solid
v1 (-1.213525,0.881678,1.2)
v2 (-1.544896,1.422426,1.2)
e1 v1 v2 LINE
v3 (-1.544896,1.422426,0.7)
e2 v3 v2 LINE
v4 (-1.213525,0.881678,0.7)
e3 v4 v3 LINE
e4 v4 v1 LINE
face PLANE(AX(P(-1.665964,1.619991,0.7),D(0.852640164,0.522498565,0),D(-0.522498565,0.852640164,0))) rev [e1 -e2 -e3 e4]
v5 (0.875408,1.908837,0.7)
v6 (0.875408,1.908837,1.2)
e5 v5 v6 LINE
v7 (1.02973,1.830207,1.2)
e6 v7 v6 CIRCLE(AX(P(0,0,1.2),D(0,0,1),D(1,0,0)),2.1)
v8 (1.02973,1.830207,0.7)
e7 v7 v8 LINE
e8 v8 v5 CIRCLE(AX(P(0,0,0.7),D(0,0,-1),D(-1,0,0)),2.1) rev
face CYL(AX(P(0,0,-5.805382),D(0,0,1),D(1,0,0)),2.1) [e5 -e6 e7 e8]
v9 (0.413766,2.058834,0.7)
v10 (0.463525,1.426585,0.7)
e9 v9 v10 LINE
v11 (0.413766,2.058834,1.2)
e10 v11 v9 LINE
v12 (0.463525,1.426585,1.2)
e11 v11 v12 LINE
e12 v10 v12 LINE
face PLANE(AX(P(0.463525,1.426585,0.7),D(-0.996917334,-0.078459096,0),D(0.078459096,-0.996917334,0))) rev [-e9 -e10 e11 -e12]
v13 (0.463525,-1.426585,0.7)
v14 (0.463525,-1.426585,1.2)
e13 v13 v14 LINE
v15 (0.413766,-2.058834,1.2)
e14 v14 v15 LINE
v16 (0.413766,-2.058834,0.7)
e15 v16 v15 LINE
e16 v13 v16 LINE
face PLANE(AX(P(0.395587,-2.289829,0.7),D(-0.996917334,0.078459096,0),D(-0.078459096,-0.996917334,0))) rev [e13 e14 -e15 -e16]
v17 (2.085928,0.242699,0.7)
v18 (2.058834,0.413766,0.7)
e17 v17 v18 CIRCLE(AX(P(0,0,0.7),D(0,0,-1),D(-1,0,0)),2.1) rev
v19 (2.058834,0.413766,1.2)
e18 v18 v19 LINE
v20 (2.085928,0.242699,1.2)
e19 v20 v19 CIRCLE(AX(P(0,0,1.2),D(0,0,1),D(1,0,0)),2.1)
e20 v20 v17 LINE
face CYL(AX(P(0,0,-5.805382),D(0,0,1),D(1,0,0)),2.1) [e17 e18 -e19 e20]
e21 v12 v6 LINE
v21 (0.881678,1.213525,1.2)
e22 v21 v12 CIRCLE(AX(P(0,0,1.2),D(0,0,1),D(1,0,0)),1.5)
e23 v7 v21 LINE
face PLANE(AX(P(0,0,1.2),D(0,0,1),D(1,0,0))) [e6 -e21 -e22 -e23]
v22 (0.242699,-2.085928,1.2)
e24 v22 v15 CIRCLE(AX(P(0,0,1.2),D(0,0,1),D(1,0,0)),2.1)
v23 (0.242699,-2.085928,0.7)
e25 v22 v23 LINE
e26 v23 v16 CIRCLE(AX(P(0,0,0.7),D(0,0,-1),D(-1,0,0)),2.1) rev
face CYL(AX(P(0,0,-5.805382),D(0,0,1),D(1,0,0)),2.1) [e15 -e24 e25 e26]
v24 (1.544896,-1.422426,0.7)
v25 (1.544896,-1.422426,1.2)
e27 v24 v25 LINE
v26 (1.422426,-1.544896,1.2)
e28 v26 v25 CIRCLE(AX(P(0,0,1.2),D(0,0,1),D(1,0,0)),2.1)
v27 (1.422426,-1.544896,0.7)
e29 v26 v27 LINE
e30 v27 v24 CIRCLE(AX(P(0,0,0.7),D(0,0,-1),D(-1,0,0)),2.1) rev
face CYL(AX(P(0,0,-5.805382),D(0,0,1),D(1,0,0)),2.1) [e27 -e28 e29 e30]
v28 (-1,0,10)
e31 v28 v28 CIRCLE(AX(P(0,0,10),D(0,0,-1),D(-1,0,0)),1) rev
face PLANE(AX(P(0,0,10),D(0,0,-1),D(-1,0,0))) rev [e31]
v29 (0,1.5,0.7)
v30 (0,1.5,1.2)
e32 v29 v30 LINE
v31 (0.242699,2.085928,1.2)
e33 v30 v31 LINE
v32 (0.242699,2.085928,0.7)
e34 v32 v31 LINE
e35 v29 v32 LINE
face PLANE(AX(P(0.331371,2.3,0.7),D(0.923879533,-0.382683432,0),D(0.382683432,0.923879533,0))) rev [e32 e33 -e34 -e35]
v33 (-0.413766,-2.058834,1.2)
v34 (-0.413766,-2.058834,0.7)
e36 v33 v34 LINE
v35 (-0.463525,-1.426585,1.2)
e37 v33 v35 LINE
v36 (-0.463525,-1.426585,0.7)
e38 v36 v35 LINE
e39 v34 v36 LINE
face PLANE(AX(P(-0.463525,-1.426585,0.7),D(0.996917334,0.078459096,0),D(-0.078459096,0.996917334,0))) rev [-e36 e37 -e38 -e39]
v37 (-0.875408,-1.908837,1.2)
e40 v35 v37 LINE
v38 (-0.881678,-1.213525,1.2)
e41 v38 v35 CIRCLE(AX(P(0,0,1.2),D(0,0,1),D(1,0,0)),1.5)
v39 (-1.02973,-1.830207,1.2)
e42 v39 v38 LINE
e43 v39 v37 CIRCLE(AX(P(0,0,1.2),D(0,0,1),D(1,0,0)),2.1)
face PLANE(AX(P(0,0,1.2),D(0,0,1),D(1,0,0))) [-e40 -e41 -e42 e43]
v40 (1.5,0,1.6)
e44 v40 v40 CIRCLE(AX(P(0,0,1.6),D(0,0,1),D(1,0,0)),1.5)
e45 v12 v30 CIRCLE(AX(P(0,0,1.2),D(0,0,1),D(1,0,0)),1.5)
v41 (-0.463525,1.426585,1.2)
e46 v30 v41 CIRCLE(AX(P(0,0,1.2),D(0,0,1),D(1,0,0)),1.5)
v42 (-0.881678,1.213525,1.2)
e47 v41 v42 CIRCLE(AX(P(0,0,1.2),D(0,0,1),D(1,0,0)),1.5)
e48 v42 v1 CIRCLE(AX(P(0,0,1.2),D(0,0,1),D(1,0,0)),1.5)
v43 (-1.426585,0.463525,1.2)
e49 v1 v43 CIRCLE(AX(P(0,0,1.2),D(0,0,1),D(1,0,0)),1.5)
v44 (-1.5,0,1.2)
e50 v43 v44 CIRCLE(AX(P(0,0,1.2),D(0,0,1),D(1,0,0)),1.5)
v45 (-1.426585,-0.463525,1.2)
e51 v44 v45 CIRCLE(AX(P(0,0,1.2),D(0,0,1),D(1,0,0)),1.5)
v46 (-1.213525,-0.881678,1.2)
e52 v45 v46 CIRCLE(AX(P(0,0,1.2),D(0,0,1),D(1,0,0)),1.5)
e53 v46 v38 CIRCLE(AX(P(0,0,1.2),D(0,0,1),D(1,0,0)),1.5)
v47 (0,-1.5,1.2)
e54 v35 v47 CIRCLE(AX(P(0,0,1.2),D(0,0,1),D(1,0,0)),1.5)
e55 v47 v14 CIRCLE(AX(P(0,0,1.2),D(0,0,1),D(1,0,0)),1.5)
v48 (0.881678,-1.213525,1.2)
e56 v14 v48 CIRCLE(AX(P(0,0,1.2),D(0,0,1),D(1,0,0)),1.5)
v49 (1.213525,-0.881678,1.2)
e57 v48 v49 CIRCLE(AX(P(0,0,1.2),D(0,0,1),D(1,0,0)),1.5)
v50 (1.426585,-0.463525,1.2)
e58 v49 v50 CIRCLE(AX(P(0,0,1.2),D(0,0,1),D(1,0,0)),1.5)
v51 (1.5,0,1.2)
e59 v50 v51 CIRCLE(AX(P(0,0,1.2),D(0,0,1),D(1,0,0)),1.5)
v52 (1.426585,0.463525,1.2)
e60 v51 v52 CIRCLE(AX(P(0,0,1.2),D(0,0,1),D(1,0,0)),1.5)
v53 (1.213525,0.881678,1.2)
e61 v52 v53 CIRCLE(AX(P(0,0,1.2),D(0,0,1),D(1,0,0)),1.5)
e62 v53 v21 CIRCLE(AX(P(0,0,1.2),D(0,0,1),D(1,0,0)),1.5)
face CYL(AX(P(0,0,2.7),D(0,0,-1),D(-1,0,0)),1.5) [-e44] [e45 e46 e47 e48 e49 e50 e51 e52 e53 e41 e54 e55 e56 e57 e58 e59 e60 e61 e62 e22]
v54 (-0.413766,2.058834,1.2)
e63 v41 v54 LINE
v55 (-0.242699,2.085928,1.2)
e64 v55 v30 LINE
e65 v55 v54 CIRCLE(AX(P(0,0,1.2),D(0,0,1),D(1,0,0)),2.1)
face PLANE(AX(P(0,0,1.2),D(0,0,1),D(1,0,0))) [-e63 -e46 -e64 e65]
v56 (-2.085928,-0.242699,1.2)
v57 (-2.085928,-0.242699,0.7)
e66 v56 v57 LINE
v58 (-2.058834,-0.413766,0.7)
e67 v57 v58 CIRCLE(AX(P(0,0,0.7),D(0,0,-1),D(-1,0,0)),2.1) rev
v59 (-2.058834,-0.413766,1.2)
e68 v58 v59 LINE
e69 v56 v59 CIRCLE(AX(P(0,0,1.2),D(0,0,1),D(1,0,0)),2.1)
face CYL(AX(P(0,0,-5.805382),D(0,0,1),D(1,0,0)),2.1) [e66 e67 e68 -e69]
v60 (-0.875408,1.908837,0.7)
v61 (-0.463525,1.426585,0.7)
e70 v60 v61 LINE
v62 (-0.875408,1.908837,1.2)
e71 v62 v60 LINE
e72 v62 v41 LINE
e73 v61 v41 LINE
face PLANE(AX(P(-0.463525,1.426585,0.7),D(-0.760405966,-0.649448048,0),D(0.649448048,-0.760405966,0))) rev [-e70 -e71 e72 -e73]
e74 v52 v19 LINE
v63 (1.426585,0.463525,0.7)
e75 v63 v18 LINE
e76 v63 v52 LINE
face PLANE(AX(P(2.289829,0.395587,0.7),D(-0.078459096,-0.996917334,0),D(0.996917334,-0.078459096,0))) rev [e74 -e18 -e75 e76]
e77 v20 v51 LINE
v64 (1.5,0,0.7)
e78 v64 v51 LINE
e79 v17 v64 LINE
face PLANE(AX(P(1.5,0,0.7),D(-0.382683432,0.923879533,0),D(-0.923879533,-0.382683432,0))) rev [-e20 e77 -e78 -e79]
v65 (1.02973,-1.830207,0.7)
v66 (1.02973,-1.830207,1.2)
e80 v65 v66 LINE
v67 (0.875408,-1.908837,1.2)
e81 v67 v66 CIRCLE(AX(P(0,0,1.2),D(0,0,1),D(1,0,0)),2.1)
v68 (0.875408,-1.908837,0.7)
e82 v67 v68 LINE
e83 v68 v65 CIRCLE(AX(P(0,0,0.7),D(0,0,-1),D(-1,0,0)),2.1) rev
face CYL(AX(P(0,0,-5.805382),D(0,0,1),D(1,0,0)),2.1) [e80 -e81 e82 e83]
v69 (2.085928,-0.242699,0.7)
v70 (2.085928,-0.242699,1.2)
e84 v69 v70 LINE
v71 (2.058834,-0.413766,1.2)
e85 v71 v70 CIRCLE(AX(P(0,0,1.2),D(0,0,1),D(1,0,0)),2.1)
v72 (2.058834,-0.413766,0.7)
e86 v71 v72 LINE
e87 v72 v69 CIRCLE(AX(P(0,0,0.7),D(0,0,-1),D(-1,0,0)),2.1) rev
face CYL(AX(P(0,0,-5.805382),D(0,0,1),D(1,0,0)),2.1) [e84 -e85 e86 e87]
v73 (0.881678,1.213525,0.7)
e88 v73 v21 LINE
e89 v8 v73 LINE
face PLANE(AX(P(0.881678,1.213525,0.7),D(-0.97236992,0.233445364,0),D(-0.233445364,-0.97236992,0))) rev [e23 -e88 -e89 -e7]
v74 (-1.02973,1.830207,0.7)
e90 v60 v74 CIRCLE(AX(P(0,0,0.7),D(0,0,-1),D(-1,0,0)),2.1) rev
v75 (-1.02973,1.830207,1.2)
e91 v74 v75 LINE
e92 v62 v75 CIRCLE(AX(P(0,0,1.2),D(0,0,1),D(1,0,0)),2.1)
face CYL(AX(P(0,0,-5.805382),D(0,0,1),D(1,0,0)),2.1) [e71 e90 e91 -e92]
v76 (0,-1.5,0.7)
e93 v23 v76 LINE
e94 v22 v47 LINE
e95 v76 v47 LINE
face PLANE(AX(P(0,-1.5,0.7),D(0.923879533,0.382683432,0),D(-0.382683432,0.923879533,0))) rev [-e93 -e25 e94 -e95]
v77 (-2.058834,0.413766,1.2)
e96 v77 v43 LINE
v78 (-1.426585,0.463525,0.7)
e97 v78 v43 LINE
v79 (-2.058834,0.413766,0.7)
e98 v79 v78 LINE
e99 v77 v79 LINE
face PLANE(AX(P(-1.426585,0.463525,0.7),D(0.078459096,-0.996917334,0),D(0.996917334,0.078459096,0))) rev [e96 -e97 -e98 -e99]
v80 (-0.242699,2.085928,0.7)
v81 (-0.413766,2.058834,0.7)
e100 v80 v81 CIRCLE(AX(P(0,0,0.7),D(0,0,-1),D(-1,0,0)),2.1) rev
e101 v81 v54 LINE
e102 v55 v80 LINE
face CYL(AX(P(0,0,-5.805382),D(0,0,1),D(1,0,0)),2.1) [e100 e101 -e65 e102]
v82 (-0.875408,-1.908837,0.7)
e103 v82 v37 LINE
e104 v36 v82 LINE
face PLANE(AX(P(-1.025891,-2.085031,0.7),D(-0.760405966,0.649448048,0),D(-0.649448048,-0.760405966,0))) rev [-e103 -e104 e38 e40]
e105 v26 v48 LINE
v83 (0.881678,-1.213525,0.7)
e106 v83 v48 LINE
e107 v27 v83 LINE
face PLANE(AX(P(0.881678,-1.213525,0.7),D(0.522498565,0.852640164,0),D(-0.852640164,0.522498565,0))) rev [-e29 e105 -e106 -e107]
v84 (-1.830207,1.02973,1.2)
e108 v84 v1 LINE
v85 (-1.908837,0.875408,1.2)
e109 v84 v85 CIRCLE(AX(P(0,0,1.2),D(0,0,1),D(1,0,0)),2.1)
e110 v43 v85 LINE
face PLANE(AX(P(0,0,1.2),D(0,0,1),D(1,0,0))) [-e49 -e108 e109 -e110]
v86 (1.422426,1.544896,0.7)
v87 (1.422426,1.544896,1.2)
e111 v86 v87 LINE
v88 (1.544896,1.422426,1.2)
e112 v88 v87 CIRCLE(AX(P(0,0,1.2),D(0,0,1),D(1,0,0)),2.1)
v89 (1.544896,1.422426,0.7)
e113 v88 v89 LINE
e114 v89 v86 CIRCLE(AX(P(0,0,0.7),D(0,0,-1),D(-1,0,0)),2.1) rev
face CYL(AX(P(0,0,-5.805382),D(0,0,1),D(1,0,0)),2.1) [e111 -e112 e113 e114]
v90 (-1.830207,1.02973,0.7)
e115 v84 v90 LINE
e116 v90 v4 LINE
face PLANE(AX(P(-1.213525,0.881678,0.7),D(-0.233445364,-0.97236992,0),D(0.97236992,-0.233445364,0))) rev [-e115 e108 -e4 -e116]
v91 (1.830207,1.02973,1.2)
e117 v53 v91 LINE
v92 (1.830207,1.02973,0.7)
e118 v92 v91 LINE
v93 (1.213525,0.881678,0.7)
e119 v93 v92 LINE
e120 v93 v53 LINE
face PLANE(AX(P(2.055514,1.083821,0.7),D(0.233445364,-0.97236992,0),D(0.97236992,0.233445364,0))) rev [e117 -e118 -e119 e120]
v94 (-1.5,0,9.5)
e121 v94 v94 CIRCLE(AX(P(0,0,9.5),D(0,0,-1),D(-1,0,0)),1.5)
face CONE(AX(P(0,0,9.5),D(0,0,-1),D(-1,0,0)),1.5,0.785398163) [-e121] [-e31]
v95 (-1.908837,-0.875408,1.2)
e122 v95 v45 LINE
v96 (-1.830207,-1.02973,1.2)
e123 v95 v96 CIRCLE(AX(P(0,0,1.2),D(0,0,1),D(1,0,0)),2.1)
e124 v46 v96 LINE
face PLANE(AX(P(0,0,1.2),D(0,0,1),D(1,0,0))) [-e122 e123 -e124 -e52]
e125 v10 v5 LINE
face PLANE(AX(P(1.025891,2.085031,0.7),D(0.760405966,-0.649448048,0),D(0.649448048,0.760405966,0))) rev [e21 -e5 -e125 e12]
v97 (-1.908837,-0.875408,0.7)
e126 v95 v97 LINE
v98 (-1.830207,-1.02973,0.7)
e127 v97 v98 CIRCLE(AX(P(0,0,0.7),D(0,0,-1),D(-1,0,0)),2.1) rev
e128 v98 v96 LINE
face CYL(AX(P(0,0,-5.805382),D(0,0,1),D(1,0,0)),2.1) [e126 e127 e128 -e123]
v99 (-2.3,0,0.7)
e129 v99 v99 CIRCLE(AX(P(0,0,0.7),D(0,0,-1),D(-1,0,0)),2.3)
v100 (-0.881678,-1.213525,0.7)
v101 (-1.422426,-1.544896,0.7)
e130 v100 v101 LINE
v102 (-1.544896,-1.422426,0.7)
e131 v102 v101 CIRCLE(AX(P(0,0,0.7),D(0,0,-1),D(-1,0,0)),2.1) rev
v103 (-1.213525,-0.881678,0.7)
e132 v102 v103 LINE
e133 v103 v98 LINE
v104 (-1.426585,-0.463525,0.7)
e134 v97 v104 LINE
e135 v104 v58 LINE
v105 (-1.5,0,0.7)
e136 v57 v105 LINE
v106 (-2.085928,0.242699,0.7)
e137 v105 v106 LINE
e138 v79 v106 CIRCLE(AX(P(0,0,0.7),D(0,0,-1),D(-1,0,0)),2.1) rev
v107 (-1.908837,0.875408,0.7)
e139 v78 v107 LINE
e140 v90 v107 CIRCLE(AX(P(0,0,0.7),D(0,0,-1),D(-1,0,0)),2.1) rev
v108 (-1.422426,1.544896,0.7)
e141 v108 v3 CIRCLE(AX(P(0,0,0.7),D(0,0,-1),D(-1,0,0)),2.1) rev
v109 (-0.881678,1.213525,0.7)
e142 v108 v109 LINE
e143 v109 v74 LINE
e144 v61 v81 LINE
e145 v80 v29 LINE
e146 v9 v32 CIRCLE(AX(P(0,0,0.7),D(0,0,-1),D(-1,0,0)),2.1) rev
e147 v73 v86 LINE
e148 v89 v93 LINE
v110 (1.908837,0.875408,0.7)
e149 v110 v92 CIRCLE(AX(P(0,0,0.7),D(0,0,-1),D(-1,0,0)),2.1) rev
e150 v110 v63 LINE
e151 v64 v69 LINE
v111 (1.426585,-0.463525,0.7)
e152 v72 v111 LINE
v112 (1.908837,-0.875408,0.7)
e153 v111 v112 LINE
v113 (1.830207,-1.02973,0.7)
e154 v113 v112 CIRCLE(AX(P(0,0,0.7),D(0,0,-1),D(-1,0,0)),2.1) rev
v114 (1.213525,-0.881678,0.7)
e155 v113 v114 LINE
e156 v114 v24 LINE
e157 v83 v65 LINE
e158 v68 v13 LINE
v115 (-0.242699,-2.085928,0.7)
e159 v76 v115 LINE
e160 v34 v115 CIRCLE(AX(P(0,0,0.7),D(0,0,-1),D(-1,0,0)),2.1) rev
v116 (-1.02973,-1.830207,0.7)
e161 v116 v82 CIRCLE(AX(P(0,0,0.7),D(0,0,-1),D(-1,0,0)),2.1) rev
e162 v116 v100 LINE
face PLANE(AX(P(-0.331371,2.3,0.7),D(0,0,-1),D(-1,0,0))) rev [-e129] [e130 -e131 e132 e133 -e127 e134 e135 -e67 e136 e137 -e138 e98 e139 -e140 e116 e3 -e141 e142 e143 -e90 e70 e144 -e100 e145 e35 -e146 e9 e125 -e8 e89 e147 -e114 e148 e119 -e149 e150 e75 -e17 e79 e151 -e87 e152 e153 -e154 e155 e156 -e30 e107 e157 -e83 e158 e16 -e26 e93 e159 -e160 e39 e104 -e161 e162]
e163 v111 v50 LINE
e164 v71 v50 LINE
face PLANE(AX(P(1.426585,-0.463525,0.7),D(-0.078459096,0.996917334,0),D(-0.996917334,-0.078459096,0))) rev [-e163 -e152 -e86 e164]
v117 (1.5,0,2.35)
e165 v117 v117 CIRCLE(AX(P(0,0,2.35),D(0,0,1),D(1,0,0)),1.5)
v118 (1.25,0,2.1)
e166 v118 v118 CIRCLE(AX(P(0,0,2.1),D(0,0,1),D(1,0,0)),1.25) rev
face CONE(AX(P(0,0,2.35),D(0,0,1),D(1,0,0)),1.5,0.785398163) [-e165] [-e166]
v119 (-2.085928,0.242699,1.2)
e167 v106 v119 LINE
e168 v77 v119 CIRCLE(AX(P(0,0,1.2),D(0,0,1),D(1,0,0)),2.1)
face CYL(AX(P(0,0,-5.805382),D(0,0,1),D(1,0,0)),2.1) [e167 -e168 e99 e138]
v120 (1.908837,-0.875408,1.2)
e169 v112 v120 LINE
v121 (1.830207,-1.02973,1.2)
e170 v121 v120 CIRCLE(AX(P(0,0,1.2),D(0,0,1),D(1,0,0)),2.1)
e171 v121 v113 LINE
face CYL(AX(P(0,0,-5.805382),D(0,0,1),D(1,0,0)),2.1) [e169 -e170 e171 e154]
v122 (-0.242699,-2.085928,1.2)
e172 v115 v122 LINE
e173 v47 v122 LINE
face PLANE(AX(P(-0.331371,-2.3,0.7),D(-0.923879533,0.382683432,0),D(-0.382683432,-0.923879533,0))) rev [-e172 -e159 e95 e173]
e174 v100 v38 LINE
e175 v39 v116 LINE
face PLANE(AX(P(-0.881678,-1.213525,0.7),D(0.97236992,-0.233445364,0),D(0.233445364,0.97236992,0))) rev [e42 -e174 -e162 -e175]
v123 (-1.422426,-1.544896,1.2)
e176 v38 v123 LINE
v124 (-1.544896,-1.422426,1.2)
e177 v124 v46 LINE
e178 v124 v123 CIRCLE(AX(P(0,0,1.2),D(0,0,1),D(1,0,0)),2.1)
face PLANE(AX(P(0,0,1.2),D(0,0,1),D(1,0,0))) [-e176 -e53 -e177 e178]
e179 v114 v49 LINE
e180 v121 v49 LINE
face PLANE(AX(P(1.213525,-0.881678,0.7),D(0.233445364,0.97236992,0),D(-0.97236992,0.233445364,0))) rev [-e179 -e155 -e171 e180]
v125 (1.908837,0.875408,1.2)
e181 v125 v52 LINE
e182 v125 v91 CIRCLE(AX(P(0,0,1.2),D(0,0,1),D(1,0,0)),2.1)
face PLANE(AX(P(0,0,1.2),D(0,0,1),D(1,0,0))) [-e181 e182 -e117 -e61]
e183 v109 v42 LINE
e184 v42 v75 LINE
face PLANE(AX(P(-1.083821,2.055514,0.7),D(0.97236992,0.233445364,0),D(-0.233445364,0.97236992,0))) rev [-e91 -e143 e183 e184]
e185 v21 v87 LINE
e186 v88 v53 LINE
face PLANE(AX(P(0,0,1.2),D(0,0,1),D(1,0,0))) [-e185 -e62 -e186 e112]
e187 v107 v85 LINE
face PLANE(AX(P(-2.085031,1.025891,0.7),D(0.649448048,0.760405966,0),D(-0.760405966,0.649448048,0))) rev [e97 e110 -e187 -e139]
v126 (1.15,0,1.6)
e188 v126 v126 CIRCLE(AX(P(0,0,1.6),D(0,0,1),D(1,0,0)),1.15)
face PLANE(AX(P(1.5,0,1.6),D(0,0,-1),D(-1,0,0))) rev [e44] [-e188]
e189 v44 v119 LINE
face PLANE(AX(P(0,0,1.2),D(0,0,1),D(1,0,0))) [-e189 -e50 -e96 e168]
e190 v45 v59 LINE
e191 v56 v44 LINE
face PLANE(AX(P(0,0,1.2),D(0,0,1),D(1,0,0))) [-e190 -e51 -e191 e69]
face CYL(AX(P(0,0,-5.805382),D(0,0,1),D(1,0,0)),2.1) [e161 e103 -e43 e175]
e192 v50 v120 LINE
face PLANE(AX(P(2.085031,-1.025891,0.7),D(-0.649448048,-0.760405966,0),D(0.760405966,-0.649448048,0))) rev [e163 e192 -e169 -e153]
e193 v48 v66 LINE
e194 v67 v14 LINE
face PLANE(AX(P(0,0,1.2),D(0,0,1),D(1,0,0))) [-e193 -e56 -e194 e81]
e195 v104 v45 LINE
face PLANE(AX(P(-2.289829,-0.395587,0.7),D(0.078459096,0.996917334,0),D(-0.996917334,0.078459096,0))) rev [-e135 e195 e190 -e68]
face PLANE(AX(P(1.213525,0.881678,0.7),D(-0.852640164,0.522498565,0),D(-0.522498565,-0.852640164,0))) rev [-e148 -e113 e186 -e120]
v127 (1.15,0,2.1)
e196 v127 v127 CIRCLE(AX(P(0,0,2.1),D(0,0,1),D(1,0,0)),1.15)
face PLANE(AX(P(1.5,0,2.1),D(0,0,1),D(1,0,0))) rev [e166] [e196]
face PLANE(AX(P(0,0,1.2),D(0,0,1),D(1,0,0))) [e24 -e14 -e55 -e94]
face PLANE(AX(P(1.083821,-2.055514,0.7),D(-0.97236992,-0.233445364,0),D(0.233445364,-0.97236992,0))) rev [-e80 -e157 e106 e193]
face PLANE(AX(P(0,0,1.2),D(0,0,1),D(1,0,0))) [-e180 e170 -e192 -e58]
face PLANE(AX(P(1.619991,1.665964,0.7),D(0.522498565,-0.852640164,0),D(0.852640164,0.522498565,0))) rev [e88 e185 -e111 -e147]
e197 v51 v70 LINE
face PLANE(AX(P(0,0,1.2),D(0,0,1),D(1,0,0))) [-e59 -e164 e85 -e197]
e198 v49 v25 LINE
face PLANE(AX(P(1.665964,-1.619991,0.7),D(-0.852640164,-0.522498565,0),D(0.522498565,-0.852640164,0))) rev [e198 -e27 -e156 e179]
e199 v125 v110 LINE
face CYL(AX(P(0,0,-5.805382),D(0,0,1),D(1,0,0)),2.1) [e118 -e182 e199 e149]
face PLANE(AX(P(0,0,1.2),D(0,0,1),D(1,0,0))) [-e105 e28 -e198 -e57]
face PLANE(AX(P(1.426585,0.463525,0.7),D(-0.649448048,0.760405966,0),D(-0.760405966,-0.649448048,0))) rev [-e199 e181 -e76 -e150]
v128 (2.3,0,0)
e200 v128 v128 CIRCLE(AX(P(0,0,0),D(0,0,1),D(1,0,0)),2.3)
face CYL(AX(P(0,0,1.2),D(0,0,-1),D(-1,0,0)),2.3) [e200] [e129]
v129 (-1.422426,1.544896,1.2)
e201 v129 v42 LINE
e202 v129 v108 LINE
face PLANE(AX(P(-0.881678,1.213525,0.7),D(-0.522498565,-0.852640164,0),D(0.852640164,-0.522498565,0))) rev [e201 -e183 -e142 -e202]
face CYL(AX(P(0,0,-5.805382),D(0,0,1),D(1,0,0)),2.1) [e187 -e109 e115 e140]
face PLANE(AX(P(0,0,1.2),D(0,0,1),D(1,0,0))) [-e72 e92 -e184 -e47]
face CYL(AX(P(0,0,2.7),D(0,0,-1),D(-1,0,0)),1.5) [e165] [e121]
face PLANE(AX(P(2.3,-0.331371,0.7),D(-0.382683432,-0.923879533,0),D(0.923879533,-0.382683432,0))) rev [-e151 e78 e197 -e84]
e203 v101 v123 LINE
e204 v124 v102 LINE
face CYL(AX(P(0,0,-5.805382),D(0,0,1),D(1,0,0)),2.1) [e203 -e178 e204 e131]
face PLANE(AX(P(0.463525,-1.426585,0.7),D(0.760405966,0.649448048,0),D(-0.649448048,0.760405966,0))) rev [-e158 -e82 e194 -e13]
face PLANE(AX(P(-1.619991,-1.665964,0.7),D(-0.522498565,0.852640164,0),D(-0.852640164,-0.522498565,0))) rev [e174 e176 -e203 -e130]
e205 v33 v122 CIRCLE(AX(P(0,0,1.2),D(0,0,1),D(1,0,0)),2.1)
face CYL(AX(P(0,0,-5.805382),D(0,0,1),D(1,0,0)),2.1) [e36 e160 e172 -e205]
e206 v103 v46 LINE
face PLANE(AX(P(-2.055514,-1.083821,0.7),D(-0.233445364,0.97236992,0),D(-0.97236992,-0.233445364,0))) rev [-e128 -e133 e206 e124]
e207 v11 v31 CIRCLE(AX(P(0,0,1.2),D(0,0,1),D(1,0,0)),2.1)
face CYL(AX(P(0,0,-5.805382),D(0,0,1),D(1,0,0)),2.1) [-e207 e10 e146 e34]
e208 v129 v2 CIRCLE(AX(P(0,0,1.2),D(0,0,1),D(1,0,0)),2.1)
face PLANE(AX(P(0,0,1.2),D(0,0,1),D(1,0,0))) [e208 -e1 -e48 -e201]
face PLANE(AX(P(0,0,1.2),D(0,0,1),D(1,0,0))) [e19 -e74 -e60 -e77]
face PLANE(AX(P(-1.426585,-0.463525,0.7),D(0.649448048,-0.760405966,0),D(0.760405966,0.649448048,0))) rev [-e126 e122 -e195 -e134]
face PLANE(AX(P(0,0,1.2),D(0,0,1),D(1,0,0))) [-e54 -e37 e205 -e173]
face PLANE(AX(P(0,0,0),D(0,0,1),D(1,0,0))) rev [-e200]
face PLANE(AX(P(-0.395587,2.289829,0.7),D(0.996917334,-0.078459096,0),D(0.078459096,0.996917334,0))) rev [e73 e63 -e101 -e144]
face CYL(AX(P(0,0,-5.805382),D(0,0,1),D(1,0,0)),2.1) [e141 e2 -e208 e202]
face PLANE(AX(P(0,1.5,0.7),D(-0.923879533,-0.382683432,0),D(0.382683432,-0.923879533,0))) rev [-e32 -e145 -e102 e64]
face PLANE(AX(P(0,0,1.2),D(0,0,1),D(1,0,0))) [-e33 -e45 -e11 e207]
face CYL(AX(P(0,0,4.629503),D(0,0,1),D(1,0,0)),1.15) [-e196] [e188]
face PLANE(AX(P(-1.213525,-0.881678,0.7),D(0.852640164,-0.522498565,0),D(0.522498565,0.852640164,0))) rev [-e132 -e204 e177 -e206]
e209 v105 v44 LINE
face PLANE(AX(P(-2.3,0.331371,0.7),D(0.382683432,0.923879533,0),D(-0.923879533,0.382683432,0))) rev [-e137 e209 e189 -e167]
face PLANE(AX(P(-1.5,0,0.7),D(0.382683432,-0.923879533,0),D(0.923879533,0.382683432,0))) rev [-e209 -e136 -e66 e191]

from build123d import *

# Parameters (mm, degrees)
SKETCH_1_R               = 2.3
EXTRUDE_1_DEPTH          = 1.2
SKETCH_2_R               = 1.5
EXTRUDE_2_DEPTH          = 1.5
CUT_EXTRUDE_1_DEPTH      = 0.5
PATTERN_CIRCULAR_1_COUNT = 20
SKETCH_4_W               = 0.35
SKETCH_4_H               = 0.5
SKETCH_6_W               = 7.3
SKETCH_6_H               = 1.5
CHAMFER_2_SIZE           = 0.5
CUT_EXTRUDE_START        = -0.5
SKETCH_7_R               = 2.3
SKETCH_7_R_2             = 2.1
CUT_EXTRUDE_2_DEPTH      = 0.5


with BuildPart() as part:
    # Эскиз1 → Вытянуть1 (new body)
    with BuildSketch(Plane.XY):
        Circle(SKETCH_1_R)
    extrude(amount=EXTRUDE_1_DEPTH)

    # Эскиз2 → Вытянуть2 (add)
    with BuildSketch(Plane.XY.offset(1.2)):
        Circle(SKETCH_2_R)
    extrude(amount=EXTRUDE_2_DEPTH)

    # Эскиз3 → Вырез-Вытянуть1 (cut)
    with BuildSketch(Plane.XY.offset(1.2)):
        Polygon((-0.33137085, 2.3), (0.33137085, 2.3), (0, 1.5), align=None)
    cut_extrude_1 = extrude(amount=-CUT_EXTRUDE_1_DEPTH, mode=Mode.SUBTRACT)

    # Круговой массив1: Вырез-Вытянуть1 ×20 about axis
    pattern_circular_1_axis = Axis((0, 0, 0), (0, 0, 1))
    for i in range(1, PATTERN_CIRCULAR_1_COUNT):
        add(cut_extrude_1.rotate(pattern_circular_1_axis, i * 360 / PATTERN_CIRCULAR_1_COUNT), mode=Mode.SUBTRACT)

    # Эскиз4 → Вырез-Повернуть1 (revolve, cut)
    with BuildSketch(Plane(origin=(0, 0, 0), x_dir=(1, 0, 0), z_dir=(0, 1, 0))):
        with Locations((1.325, -1.85)):
            Rectangle(SKETCH_4_W, SKETCH_4_H)
    revolve(axis=Axis((0, 0, 10.642619983), (0, 0, -1)), mode=Mode.SUBTRACT)

    # Эскиз6 → Повернуть1 (revolve)
    with BuildSketch(Plane(origin=(0, 0, 0), x_dir=(0, 0, -1), z_dir=(1, 0, 0)), mode=Mode.PRIVATE) as revolve_1_sk:
        with Locations((-6.35, -0.75)):
            Rectangle(SKETCH_6_W, SKETCH_6_H)
    revolve(revolve_1_sk.sketch.rotate(Axis((0, 0, 2.7), (0, 0, 1)), 278.047567557), axis=Axis((0, 0, 2.7), (0, 0, 1)))

    # Фаска2
    # the kernel refuses this chamfer: 0.5 mm, written as the material it takes off along each edge
    with BuildSketch(Plane(origin=(0, 0, 10), x_dir=(-0.9901521845161062, -0.1399951838385265, 0), z_dir=(-0.1399951838385265, 0.9901521845161062, 0))) as chamfer_2_piece_1:
        Polygon((1.5, -CHAMFER_2_SIZE), (1.5 - CHAMFER_2_SIZE, 0), (1.5, 0), align=None)
    revolve(axis=Axis((0, 0, 10), (0, 0, 1)), mode=Mode.SUBTRACT)

    # Эскиз7 → Вырез-Вытянуть2 (cut)
    with BuildSketch(Plane.XY.offset(1.2).offset(CUT_EXTRUDE_START)):
        with Locations(Location((0, 0, 0), (0, 0, 180))):
            Circle(SKETCH_7_R)
        Circle(SKETCH_7_R_2, mode=Mode.SUBTRACT)
    extrude(amount=CUT_EXTRUDE_2_DEPTH, mode=Mode.SUBTRACT)

    # Фаска3
    # the kernel refuses this chamfer: 0.25 mm, written as the material it takes off along each edge
    with BuildSketch(Plane(origin=(0, 0, 2.1), x_dir=(1, 0, 0), z_dir=(0, 1, 0))) as chamfer_3_piece_1:
        with BuildLine():
            Line((1.242928932, 0.007071068), (1.507071068, -0.257071068))
            Line((1.507071068, -0.257071068), (1.512071068, -0.257071068))
            ThreePointArc((1.512071068, -0.257071068), (1.505, -0.128535534), (1.505, 0))
            Line((1.505, 0), (1.5, 0.005))
            ThreePointArc((1.5, 0.005), (1.371464466, 0.005), (1.242928932, 0.012071068))
            Line((1.242928932, 0.012071068), (1.242928932, 0.007071068))
        make_face()
    revolve(axis=Axis((0, 0, 2.1), (0, 0, -1)), mode=Mode.SUBTRACT)


solid = part.part
